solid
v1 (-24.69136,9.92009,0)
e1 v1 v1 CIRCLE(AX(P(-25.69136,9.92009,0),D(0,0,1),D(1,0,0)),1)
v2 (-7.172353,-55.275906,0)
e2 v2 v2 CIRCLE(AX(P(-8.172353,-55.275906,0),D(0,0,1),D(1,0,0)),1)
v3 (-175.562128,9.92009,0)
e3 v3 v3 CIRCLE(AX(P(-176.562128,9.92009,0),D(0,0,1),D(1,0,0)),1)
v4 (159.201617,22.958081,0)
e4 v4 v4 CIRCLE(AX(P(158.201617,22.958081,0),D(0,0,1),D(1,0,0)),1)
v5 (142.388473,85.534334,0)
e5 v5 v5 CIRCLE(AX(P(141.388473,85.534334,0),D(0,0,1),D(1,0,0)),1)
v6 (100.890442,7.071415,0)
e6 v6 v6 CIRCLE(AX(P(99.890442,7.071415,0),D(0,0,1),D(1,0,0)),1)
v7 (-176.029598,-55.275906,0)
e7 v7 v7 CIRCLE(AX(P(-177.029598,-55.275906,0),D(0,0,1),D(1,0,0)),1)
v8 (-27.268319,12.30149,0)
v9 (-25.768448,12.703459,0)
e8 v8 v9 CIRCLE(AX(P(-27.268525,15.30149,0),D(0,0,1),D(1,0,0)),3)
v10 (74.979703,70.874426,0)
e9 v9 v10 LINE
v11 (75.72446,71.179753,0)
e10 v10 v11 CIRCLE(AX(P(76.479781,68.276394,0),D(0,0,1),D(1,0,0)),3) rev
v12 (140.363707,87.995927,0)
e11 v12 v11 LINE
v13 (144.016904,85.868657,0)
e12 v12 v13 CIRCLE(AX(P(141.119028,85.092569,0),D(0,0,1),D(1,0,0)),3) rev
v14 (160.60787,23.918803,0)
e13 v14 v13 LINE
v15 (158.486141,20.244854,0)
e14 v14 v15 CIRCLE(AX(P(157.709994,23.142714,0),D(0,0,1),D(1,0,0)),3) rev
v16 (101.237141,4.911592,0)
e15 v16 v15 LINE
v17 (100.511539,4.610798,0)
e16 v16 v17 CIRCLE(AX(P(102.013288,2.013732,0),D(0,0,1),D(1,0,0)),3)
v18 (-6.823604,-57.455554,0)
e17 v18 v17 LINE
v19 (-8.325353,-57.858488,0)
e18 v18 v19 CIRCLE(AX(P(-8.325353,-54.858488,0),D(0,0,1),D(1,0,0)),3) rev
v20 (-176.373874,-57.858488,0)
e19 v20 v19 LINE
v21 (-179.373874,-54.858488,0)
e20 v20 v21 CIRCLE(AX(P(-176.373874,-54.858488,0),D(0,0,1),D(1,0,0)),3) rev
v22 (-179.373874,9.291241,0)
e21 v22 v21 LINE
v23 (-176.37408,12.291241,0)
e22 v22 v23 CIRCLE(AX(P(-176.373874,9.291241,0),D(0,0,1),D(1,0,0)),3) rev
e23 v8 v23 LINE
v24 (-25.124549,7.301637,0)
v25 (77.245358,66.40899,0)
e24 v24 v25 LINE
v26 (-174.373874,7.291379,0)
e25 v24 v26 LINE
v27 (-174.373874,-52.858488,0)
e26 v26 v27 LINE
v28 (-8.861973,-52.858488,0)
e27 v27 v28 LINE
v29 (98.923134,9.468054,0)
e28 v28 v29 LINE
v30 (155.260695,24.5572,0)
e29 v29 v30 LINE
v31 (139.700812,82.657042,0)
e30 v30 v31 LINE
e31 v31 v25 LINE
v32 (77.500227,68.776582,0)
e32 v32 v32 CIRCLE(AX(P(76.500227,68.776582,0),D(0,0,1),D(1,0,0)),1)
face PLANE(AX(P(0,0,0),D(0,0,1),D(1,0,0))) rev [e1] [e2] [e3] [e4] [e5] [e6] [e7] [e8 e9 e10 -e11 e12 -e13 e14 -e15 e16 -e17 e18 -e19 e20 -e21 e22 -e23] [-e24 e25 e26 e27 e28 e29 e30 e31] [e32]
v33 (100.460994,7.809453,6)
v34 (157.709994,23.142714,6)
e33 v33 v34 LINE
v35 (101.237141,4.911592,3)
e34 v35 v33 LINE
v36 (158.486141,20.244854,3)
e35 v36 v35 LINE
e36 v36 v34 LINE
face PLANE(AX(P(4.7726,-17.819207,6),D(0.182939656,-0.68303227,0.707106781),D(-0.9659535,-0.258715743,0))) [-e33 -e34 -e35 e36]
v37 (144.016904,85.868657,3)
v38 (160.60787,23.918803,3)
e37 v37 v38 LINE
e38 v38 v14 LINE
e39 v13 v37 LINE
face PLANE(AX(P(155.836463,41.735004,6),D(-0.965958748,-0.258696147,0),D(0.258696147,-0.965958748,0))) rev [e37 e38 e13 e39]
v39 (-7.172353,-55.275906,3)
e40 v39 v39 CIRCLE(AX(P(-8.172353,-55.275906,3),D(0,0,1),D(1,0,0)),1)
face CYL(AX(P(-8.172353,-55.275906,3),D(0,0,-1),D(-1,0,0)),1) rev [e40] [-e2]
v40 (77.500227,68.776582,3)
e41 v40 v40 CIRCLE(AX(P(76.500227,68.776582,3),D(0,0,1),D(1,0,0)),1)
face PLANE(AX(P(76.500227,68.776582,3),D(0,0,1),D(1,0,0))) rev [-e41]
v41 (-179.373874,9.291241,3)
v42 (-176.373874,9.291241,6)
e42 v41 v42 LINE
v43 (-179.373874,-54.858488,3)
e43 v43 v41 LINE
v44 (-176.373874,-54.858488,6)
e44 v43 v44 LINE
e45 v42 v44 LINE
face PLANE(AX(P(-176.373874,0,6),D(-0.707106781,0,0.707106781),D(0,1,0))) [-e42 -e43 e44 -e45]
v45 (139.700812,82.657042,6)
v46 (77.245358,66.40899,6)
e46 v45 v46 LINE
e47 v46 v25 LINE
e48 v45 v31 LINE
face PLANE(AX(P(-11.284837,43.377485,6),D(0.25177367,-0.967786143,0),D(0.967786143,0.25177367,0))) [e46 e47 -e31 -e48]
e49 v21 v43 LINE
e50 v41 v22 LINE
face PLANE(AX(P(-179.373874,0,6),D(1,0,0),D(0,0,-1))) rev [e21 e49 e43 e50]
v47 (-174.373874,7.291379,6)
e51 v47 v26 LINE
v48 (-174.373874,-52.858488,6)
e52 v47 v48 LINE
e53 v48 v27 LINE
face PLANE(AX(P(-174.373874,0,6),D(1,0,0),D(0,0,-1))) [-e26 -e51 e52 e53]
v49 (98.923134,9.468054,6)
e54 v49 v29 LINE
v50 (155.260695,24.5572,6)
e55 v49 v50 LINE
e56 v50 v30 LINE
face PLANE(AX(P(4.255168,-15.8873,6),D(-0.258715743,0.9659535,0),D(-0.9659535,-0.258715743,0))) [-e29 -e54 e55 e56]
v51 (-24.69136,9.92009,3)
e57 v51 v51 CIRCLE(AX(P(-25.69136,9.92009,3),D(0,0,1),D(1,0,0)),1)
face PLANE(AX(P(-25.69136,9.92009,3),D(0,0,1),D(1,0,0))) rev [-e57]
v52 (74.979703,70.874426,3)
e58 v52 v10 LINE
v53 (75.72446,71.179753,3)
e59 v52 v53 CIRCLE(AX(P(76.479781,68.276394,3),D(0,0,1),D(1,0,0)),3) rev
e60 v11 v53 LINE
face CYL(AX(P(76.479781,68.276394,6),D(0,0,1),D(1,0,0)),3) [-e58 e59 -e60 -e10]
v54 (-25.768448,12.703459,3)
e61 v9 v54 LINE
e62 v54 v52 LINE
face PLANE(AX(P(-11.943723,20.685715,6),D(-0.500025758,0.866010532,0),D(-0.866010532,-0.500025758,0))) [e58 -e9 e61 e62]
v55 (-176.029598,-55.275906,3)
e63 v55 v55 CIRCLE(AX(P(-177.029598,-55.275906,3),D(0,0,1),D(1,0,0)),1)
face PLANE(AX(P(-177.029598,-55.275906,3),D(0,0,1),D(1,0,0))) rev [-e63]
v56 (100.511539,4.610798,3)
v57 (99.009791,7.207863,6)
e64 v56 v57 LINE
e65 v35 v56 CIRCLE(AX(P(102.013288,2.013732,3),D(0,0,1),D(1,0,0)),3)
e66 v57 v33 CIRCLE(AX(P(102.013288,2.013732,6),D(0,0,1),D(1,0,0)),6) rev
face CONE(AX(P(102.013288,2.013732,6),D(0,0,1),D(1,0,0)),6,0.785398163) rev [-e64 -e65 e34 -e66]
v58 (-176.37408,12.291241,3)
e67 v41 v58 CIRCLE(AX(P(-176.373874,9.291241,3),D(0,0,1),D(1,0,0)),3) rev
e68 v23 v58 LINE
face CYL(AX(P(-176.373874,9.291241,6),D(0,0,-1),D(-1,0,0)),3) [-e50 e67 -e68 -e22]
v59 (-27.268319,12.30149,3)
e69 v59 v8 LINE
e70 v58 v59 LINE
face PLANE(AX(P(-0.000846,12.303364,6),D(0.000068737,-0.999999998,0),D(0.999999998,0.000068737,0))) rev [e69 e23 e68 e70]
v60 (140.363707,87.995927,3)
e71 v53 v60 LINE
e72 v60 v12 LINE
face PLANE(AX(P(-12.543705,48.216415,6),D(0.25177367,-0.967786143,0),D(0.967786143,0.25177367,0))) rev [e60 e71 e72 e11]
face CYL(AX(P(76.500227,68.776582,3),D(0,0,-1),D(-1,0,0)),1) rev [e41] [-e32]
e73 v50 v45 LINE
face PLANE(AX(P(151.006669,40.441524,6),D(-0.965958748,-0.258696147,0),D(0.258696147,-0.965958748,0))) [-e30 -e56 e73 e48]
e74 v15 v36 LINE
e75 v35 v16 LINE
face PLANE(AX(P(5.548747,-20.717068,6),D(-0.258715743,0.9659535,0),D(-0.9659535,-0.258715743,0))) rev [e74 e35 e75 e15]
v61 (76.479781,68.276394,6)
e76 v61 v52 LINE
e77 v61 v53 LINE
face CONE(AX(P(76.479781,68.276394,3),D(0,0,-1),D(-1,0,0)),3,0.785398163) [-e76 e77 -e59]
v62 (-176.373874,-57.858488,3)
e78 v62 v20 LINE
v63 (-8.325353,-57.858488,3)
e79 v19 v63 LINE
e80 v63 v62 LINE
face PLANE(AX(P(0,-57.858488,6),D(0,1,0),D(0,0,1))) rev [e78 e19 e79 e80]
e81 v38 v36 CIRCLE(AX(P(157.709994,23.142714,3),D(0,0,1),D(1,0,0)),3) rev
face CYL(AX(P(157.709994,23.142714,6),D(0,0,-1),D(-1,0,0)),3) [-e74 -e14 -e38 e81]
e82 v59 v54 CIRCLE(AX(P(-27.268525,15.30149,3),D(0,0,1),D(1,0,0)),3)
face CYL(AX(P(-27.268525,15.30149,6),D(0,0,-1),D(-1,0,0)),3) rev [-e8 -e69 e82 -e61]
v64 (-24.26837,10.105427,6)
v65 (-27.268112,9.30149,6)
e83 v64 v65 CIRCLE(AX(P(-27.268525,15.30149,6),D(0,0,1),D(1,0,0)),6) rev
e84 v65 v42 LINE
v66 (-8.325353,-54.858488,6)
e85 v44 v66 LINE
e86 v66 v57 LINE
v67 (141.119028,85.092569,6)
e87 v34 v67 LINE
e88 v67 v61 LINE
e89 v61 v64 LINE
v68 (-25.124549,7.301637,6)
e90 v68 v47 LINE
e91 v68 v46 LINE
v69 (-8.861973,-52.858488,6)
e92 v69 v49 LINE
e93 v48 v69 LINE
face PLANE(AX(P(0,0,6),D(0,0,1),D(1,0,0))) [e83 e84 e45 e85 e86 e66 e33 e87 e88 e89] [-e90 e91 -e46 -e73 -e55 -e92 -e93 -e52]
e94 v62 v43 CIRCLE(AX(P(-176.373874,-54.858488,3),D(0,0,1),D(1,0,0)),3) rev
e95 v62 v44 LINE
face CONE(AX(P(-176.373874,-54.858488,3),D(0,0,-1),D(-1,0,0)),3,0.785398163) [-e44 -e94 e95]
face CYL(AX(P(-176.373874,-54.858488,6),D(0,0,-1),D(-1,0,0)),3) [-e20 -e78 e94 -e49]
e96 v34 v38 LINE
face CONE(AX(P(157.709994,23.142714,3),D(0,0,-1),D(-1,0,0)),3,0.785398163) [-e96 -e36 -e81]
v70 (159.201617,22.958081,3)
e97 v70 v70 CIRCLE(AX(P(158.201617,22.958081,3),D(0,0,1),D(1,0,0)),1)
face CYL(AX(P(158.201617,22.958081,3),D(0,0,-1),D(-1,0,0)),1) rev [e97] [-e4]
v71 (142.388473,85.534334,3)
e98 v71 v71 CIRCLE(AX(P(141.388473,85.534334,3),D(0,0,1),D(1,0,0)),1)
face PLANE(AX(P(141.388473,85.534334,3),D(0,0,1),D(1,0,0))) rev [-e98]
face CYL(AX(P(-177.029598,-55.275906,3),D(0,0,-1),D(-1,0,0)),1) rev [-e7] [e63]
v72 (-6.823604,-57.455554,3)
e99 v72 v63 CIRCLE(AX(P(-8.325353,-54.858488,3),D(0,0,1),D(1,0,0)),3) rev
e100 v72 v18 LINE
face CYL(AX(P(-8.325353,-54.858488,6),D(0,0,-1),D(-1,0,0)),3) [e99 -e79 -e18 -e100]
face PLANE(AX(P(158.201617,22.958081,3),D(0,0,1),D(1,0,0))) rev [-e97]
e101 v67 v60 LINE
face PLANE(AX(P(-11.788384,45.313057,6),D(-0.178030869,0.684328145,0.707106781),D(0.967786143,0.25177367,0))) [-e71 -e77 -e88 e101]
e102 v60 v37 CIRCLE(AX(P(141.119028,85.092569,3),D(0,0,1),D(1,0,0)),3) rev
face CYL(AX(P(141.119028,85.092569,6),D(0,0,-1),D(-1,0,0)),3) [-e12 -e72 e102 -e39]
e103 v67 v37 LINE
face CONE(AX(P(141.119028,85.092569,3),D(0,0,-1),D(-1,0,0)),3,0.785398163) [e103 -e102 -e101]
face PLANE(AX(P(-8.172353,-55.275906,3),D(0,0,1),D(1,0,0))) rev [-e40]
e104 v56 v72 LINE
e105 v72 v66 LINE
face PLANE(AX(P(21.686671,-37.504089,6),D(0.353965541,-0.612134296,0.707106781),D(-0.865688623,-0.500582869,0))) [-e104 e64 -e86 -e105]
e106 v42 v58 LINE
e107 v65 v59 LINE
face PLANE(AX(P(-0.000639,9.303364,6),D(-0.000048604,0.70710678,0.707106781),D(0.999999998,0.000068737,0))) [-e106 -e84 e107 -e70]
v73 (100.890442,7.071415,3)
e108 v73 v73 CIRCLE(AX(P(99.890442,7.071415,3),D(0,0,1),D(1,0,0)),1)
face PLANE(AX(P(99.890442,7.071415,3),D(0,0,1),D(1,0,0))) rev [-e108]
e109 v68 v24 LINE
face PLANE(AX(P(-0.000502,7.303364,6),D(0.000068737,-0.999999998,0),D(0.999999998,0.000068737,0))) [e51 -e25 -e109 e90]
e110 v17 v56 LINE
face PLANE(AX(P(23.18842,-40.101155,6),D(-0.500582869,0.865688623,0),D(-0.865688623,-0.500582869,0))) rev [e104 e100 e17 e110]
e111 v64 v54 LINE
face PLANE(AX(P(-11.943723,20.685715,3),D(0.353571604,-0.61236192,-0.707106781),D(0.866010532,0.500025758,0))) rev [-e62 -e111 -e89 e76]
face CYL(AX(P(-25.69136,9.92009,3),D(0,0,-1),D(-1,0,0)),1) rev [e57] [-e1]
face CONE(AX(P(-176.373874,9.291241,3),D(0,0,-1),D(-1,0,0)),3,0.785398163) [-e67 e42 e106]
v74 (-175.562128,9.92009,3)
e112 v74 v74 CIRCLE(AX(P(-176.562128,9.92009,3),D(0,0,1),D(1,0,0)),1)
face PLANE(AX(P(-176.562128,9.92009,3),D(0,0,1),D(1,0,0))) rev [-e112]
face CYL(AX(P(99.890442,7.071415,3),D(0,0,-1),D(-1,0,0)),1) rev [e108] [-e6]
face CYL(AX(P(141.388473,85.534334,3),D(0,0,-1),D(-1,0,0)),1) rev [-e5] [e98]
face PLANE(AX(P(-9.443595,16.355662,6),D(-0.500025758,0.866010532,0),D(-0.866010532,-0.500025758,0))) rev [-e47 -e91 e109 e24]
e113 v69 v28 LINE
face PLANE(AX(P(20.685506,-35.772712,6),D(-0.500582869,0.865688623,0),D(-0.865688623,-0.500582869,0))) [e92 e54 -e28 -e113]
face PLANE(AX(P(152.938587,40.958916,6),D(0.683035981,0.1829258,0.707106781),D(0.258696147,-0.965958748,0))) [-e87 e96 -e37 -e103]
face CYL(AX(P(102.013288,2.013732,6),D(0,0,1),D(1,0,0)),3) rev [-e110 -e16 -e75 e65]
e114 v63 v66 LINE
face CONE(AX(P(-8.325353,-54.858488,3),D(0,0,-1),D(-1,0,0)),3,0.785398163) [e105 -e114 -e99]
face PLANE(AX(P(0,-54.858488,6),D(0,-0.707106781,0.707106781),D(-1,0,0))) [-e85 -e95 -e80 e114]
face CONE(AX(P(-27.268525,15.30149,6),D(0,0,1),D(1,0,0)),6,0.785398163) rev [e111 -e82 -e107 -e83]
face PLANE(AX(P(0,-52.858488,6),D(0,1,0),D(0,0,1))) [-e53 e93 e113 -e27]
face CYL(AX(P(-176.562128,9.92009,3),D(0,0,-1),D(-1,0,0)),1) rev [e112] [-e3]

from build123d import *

# Parameters (mm, degrees)
BOSS_EXTRU_1_DEPTH      = 6
CONG_1_R                = 3
ESQUISSE2_R             = 1
ENL_V_MAT_EXTRU_1_DEPTH = 3
CHANFREIN1_SIZE         = 3


with BuildPart() as part:
    # Esquisse1 → Boss.-Extru.1 (new body)
    with BuildSketch(Plane.XY):
        Polygon((-26.464533767, 12.30154537), (75.33141454, 71.077500491), (143.246352653, 88.745859712), (161.383942986, 21.020985262), (100.854480283, 4.809102496), (-7.520422715, -57.858487698), (-179.373873722, -57.858487698), (-179.373873722, -50.687645053), (-179.373873722, 12.291034855), align=None)
        Polygon((-25.124548608, 7.301637465), (-174.373873722, 7.291378528), (-174.373873722, -50.687645053), (-174.373873722, -52.858487698), (-8.861972593, -52.858487698), (98.923133978, 9.468053786), (155.26069475, 24.557200291), (139.700811798, 82.657041562), (77.245358051, 66.408990356), align=None, mode=Mode.SUBTRACT)
    extrude(amount=BOSS_EXTRU_1_DEPTH)

    # Congé1
    cong_1_edges = [part.edges().sort_by_distance(p)[0] for p in [
        (75.33141454, 71.077500491, 3),
        (143.246352653, 88.745859712, 3),
        (161.383942986, 21.020985262, 3),
        (100.854480283, 4.809102496, 3),
        (-7.520422715, -57.858487698, 3),
        (-179.373873722, -57.858487698, 3),
        (-179.373873722, 12.291034855, 3),
        (-26.464533767, 12.30154537, 3),
    ]]
    fillet(cong_1_edges, radius=CONG_1_R)

    # Esquisse2 → Enlèv. mat.-Extru.1 (cut)
    with BuildSketch(Plane.XY):
        with Locations((158.201617013, 22.958080812)):
            Circle(ESQUISSE2_R)
        with Locations((141.388472611, 85.534334234)):
            Circle(ESQUISSE2_R)
        with Locations((76.500226548, 68.776582274)):
            Circle(ESQUISSE2_R)
        with Locations((99.890442316, 7.071415488)):
            Circle(ESQUISSE2_R)
        with Locations((-8.172352823, -55.275906246)):
            Circle(ESQUISSE2_R)
        with Locations((-25.691359515, 9.920090126)):
            Circle(ESQUISSE2_R)
        with Locations((-176.562127678, 9.920090126)):
            Circle(ESQUISSE2_R)
        with Locations((-177.029598341, -55.275906246)):
            Circle(ESQUISSE2_R)
    extrude(amount=ENL_V_MAT_EXTRU_1_DEPTH, mode=Mode.SUBTRACT)

    # Chanfrein1
    chanfrein1_edges = [part.edges().sort_by_distance(p)[0] for p in [
        (-92.349613182, -57.858487698, 6),
        (-179.373873722, -22.78362332, 6),
        (24.605627892, 41.788942262, 6),
        (-101.821199292, 12.296365586, 6),
        (46.843967712, -26.422377988, 6),
        (129.861641055, 12.578223, 6),
        (152.312387337, 54.893729991, 6),
        (108.044083383, 79.587840046, 6),
        (-178.495266971, 11.412488494, 6),
        (75.341794938, 71.05218052, 6),
        (142.628648998, 87.685066626, 6),
        (160.307894606, 21.642410085, 6),
        (-7.547920203, -57.756003669, 6),
        (-178.495194066, -56.979808041, 6),
        (100.86445313, 4.78504518, 6),
        (-26.491925042, 12.40375087, 6),
    ]]
    chamfer(chanfrein1_edges, length=CHANFREIN1_SIZE - 0.0001)  # a hair under: the kernel refuses the full size


solid = part.part
